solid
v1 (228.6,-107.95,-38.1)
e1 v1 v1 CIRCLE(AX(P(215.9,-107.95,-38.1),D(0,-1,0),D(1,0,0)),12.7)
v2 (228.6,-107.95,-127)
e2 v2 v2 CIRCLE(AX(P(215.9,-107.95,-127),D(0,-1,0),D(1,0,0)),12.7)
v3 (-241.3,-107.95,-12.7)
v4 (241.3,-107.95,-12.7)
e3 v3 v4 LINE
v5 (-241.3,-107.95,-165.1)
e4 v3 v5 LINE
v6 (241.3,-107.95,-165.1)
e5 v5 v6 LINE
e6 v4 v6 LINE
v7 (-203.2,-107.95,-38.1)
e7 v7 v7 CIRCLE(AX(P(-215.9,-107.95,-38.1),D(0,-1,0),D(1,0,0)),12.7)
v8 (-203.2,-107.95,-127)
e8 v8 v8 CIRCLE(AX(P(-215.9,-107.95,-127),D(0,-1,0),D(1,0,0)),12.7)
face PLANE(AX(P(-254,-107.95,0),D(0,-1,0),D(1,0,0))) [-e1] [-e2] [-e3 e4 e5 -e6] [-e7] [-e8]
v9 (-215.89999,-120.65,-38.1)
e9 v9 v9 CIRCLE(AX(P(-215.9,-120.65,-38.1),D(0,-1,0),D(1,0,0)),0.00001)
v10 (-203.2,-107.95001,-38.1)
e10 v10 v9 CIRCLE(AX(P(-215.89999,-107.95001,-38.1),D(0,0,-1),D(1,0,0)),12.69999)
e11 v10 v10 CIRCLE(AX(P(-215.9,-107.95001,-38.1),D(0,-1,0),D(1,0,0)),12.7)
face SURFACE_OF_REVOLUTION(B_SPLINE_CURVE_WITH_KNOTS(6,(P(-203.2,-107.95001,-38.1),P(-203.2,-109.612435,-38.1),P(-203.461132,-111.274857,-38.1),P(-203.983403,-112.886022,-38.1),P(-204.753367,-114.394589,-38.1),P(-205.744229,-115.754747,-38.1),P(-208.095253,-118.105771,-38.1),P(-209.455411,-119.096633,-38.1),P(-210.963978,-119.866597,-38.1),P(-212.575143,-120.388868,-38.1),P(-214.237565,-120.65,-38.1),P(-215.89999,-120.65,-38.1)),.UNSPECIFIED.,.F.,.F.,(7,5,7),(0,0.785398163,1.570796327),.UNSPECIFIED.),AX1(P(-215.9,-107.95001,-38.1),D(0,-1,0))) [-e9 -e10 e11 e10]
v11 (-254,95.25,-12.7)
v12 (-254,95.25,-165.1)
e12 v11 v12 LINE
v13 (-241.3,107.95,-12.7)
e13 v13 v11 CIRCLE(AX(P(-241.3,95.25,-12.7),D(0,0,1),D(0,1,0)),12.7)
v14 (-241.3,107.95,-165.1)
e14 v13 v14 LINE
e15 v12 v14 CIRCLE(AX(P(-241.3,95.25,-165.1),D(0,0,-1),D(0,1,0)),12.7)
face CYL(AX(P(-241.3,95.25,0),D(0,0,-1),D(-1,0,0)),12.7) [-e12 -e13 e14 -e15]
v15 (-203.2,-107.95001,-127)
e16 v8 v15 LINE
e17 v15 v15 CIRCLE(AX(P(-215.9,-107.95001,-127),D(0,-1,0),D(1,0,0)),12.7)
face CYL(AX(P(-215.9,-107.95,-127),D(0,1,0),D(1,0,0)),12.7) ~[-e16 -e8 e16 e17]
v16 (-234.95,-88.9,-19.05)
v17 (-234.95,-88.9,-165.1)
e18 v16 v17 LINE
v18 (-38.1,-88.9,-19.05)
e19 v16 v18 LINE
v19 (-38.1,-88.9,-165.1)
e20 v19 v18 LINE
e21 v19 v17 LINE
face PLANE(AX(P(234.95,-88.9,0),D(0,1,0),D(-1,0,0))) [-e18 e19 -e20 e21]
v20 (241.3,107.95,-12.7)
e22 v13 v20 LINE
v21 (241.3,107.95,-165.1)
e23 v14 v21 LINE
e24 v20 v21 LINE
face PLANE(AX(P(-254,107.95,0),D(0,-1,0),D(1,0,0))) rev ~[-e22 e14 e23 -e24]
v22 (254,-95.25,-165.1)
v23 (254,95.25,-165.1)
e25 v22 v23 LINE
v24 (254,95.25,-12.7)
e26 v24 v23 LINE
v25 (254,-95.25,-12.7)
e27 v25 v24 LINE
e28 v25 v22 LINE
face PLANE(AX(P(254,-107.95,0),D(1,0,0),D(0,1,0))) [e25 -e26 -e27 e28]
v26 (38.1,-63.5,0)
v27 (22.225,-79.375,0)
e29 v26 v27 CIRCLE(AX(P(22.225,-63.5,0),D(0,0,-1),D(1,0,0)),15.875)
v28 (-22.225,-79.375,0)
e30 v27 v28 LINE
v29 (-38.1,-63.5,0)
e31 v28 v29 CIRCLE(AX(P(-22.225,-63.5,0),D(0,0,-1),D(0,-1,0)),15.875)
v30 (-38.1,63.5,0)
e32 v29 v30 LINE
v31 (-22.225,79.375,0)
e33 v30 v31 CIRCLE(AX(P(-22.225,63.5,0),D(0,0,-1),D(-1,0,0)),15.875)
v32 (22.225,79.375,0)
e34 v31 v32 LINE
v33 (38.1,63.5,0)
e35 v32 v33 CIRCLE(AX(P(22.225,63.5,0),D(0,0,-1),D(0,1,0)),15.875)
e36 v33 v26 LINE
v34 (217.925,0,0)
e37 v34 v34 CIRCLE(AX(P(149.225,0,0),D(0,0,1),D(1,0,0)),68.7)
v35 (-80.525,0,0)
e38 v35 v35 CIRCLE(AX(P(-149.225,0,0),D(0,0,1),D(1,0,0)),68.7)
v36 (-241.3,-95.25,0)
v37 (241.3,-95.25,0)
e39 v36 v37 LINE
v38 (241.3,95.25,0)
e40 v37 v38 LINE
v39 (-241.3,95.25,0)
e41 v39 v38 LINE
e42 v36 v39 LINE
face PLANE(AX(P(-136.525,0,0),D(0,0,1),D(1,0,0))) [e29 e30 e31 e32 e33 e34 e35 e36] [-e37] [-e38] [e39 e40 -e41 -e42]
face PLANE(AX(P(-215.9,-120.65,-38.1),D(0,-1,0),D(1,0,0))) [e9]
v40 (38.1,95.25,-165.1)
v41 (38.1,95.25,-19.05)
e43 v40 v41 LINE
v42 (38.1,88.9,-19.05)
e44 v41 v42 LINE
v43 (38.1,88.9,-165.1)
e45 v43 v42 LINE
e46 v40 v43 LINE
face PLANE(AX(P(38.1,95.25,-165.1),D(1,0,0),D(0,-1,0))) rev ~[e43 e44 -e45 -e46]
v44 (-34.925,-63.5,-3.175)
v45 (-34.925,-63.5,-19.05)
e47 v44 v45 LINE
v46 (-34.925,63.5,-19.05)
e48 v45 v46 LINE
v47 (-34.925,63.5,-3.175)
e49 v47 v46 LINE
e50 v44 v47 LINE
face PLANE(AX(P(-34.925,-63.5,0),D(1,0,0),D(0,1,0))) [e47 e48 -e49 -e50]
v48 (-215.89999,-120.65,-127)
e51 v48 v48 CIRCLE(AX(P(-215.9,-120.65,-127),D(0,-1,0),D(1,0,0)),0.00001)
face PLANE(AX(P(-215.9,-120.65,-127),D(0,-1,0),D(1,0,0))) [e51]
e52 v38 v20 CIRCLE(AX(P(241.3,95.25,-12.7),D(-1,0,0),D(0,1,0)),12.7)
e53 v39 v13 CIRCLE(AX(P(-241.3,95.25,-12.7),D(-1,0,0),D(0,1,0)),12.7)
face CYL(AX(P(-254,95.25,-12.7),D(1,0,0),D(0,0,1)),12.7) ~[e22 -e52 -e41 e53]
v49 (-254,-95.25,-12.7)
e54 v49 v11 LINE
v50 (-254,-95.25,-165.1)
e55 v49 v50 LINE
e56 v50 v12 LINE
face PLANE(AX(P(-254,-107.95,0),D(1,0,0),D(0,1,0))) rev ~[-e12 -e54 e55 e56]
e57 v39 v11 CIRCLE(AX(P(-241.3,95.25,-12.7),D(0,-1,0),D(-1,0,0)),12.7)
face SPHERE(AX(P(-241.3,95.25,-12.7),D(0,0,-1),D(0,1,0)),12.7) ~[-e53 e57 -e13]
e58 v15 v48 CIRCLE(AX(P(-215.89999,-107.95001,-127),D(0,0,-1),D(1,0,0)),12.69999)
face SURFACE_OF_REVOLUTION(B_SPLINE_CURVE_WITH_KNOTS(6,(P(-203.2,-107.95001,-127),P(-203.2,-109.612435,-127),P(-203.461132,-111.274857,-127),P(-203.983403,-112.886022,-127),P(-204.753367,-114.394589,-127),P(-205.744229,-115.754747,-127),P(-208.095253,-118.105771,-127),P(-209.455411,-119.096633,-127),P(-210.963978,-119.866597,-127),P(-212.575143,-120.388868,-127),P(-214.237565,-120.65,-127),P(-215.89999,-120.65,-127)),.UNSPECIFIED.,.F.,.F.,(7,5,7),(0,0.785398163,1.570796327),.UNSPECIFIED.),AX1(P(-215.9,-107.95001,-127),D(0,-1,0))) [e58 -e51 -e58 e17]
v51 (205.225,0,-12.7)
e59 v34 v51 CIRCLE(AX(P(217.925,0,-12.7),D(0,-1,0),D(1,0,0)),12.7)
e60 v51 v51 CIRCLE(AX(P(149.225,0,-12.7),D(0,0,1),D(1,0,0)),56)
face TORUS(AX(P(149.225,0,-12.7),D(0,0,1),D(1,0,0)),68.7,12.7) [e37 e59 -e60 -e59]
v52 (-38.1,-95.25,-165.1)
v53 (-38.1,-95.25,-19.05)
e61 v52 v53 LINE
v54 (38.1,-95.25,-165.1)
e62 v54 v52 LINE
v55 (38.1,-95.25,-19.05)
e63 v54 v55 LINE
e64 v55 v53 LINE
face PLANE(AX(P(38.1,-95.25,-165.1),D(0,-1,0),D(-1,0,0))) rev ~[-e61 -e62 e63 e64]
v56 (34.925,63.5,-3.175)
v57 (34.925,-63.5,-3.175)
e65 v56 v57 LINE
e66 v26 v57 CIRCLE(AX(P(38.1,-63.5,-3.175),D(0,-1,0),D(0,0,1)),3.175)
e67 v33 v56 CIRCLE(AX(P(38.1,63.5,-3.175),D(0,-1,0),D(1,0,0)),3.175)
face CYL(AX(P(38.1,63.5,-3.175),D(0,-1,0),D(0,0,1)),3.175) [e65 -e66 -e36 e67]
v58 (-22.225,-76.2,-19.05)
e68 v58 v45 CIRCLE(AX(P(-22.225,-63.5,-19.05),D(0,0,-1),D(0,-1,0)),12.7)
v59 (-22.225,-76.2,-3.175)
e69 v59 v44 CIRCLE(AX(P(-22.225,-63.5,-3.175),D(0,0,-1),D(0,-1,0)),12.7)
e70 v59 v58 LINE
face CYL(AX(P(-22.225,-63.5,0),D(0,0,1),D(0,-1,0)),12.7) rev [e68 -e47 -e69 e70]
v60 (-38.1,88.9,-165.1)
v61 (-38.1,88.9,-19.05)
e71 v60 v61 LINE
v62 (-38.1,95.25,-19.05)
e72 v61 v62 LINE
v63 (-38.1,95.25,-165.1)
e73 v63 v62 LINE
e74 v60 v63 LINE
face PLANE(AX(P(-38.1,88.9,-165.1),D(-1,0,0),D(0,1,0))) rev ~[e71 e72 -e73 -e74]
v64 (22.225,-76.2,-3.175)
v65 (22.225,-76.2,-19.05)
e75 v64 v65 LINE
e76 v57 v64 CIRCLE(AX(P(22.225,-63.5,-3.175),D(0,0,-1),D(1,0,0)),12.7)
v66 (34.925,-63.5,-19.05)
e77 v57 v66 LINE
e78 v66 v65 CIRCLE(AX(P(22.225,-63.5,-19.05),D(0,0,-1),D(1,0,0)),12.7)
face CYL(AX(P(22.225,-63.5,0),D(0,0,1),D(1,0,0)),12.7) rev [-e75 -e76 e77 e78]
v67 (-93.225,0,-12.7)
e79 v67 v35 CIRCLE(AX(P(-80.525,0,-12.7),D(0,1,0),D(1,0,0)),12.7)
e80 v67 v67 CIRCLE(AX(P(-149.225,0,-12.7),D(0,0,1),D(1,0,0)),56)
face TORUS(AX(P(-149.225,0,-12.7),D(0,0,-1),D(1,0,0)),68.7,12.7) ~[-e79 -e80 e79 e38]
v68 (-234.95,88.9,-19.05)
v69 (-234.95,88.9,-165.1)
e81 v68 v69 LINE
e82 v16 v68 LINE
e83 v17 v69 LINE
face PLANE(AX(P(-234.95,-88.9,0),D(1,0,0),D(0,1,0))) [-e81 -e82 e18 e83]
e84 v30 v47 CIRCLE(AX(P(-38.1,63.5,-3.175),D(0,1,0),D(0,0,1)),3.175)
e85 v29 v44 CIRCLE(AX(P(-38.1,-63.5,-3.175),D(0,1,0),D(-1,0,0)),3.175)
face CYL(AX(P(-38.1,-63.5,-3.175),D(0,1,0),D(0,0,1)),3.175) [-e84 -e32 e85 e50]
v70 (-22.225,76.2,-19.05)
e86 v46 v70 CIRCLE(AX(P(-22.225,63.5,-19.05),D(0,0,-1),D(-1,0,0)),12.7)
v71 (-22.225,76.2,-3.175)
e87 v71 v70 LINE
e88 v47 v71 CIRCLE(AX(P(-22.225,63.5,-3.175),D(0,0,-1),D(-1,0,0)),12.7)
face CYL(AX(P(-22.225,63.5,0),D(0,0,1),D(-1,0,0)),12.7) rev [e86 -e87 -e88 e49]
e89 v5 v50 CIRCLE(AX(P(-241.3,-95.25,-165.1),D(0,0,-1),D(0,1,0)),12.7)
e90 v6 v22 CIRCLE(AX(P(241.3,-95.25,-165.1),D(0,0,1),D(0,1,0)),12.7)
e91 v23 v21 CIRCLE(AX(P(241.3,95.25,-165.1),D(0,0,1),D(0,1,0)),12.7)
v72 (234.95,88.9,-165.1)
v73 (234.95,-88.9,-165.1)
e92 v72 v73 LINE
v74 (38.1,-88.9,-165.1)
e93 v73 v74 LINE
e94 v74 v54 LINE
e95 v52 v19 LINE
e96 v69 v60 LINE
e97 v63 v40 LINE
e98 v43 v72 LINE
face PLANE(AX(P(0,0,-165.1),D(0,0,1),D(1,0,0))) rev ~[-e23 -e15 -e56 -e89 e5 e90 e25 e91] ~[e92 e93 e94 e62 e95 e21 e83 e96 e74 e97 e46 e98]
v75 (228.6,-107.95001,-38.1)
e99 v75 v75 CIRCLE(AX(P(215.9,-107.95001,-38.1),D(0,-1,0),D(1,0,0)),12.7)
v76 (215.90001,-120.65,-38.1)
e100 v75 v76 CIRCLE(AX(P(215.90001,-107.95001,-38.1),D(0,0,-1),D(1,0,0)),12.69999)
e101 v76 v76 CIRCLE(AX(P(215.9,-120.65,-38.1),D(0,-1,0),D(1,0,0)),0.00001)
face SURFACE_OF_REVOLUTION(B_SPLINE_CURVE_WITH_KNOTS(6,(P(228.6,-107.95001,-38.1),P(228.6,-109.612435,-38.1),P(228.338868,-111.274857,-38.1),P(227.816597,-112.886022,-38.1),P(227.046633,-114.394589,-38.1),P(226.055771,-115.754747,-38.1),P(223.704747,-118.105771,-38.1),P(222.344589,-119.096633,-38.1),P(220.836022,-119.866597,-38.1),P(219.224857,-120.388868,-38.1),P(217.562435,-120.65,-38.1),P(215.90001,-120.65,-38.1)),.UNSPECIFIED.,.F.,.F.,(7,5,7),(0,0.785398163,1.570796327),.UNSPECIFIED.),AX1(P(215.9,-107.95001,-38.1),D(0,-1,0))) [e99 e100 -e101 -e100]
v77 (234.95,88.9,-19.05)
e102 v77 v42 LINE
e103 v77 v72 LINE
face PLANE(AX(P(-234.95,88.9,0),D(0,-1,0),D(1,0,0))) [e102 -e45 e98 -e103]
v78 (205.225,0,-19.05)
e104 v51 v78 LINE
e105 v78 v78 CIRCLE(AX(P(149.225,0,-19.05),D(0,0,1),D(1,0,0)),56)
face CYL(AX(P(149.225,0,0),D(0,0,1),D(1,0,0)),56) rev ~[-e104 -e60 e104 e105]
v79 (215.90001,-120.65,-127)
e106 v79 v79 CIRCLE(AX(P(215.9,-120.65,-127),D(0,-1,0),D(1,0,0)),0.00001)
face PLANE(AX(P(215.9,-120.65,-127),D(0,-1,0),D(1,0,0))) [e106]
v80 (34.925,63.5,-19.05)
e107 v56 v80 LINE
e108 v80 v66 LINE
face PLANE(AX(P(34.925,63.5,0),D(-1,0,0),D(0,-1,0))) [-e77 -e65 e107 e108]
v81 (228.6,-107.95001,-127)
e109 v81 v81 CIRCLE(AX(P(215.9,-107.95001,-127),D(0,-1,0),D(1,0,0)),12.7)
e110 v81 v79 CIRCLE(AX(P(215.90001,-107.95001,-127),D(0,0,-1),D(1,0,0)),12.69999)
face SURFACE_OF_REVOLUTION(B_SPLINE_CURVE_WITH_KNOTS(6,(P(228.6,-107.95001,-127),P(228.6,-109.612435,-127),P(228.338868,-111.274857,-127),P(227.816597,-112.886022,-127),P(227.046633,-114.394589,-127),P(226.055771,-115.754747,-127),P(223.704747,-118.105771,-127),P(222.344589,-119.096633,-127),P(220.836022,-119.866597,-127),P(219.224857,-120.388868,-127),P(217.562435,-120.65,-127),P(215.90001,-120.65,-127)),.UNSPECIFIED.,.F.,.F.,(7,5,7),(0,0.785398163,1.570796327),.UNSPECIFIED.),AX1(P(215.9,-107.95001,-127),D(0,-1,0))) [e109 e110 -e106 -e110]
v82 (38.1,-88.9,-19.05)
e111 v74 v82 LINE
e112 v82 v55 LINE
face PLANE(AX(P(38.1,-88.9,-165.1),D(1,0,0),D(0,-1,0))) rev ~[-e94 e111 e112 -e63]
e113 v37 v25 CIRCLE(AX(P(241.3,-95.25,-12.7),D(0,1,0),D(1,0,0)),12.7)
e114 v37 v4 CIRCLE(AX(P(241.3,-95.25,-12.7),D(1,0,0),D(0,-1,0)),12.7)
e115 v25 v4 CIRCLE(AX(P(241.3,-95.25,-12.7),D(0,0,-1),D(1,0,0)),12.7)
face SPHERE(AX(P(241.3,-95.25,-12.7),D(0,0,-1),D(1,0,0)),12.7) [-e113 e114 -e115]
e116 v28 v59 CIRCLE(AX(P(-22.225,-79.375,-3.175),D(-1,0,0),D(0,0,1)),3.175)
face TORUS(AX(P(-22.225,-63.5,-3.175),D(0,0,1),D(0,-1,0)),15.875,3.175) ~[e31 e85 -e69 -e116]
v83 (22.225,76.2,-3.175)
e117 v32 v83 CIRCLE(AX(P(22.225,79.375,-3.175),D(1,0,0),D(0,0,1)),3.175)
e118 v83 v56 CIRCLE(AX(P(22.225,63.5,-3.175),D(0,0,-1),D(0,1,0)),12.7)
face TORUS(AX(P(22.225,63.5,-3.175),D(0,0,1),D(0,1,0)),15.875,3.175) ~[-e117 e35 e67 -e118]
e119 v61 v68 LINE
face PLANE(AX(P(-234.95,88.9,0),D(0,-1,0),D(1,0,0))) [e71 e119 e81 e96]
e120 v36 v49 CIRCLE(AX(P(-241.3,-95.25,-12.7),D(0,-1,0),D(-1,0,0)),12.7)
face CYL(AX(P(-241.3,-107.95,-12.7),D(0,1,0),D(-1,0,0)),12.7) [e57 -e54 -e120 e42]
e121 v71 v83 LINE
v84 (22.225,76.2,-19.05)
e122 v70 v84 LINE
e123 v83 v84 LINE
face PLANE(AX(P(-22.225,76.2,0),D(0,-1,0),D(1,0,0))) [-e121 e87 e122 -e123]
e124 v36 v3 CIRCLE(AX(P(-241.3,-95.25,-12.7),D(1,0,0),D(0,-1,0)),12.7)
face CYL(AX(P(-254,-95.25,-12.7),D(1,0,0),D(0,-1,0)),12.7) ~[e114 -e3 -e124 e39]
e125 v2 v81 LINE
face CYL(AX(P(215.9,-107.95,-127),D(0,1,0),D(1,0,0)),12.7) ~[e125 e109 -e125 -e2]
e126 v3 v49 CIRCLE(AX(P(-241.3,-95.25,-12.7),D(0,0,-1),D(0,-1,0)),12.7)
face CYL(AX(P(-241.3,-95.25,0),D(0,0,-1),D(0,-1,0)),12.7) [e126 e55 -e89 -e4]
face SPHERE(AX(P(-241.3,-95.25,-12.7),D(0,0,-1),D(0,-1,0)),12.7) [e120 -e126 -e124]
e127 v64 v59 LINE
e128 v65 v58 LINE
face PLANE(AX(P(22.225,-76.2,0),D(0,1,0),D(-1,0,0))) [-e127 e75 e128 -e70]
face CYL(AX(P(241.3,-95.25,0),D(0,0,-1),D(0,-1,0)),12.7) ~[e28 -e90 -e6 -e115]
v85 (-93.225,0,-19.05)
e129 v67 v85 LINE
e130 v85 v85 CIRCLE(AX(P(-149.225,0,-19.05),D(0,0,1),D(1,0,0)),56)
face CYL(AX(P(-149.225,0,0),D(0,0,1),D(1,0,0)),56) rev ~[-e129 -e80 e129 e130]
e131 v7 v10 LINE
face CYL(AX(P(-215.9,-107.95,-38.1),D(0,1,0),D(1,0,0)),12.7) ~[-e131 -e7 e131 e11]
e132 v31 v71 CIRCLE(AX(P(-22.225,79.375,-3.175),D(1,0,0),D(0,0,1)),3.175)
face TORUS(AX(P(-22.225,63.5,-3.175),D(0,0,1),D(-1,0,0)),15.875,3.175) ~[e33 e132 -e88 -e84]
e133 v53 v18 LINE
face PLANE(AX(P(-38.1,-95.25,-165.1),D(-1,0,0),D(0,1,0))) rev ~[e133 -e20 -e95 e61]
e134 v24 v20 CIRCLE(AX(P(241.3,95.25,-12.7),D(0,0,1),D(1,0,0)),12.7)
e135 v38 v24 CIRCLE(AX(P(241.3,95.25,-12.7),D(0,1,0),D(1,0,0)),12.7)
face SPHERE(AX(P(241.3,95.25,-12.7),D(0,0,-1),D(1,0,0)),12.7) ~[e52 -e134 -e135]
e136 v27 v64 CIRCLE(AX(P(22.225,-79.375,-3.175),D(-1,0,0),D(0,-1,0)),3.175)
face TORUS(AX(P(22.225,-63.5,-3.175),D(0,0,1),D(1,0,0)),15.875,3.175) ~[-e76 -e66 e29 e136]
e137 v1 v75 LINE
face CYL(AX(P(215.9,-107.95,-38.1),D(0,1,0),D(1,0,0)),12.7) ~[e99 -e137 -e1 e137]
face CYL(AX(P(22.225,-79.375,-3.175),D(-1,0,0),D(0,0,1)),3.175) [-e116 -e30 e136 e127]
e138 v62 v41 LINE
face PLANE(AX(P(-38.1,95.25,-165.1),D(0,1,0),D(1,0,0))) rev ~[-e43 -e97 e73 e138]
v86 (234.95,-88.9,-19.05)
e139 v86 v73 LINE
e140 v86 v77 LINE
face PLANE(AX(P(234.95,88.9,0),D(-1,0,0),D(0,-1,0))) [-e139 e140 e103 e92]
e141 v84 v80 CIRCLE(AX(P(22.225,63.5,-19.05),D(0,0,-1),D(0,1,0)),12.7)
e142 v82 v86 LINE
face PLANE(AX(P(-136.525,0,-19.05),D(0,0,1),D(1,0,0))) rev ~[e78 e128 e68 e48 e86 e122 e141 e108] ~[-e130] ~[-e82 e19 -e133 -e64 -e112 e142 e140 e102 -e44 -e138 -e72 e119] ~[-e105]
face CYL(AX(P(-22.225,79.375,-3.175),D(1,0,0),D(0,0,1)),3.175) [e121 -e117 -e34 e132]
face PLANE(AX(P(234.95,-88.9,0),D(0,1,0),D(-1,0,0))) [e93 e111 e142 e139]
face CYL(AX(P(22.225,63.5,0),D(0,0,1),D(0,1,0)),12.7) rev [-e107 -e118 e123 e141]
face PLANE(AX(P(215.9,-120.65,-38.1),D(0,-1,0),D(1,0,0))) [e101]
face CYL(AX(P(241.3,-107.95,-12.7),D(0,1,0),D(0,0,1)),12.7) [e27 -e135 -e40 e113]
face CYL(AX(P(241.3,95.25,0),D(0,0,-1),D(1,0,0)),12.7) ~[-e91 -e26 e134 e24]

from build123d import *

# Parameters (mm, degrees)
F0_W     = 508
F0_H     = 215.9
F1_DEPTH = 165.1
F0_W_2   = 196.85
F0_H_2   = 177.8
F0_R     = 56
F0_W_3   = 76.2
F2_DEPTH = 19.05
F4_DEPTH = 146.05
F5_R     = 12.7
F6_R     = 3.175
F7_R     = 12.7
F8_DEPTH = 12.7
F9_R     = 12.69999
F10_R    = 12.7


# Not quite as in the source:
# - a fillet or chamfer is up to 0.001 mm smaller than in the source, because OpenCascade refuses the exact size


with BuildPart() as f1:
    # F0 (on Top) → F1 (new body)
    with BuildSketch(Plane.XY):
        Rectangle(F0_W, F0_H)
        Polygon((234.95, -88.9), (38.1, -88.9), (-38.1, -88.9), (-234.95, -88.9), (-234.95, 88.9), (-38.1, 88.9), (38.1, 88.9), (234.95, 88.9), align=None, mode=Mode.SUBTRACT)
    extrude(amount=-F1_DEPTH)

    # F0 (on Top) → F2 (join)
    with BuildSketch(Plane.XY):
        with Locations((-136.525, 0)):
            Rectangle(F0_W_2, F0_H_2)
        with Locations((-149.225, 0)):
            Circle(F0_R, mode=Mode.SUBTRACT)
        with Locations((136.525, 0)):
            Rectangle(F0_W_2, F0_H_2)
        with Locations((149.225, 0)):
            Circle(F0_R, mode=Mode.SUBTRACT)
        Rectangle(F0_W_3, F0_H_2)
        with BuildLine():
            ThreePointArc((34.925, -63.5), (31.2052561211, -72.4802561211), (22.225, -76.2))
            Line((22.225, -76.2), (-22.225, -76.2))
            ThreePointArc((-22.225, -76.2), (-31.2052561211, -72.4802561211), (-34.925, -63.5))
            Line((-34.925, -63.5), (-34.925, 63.5))
            ThreePointArc((-34.925, 63.5), (-31.2052561211, 72.4802561211), (-22.225, 76.2))
            Line((-22.225, 76.2), (22.225, 76.2))
            ThreePointArc((22.225, 76.2), (31.2052561211, 72.4802561211), (34.925, 63.5))
            Line((34.925, 63.5), (34.925, -63.5))
        make_face(mode=Mode.SUBTRACT)
    extrude(amount=-F2_DEPTH)

    # F3 (on face) → F4 (cut)
    with BuildSketch(Plane(origin=(0, 0, -165.1), x_dir=(1, 0, 0), z_dir=(0, 0, -1))):
        Polygon((-38.1, -88.9), (0, -88.9), (38.1, -88.9), (234.95, -88.9), (234.95, 88.9), (38.1, 88.9), (0, 88.9), (-38.1, 88.9), (-234.95, 88.9), (-234.95, -88.9), align=None)
        Polygon((38.1, -88.9), (0, -88.9), (-38.1, -88.9), (-38.1, -95.25), (38.1, -95.25), align=None)
        Polygon((0, 88.9), (38.1, 88.9), (38.1, 95.25), (-38.1, 95.25), (-38.1, 88.9), align=None)
    extrude(amount=-F4_DEPTH, mode=Mode.SUBTRACT)

    # F5
    f5_edges = [f1.edges().sort_by_distance(p)[0] for p in [
        (93.225, 0, 0),
        (-205.225, 0, 0),
    ]]
    fillet(f5_edges, radius=F5_R)

    # F6
    f6_edges = [f1.edges().sort_by_distance(p)[0] for p in [
        (0, 76.2, 0),
        (-34.925, 0, 0),
        (-31.205256, 72.480256, 0),
        (31.205256, 72.480256, 0),
        (34.925, 0, 0),
        (31.205256, -72.480256, 0),
        (0, -76.2, 0),
        (-31.205256, -72.480256, 0),
    ]]
    fillet(f6_edges, radius=F6_R)

    # F7 (on face) → F8 (join)
    with BuildSketch(Plane.XZ.offset(107.95)):
        with Locations((-215.9, -38.1)):
            Circle(F7_R)
        with Locations((-215.9, -127)):
            Circle(F7_R)
        with Locations((215.9, -38.1)):
            Circle(F7_R)
        with Locations((215.9, -127)):
            Circle(F7_R)
    extrude(amount=F8_DEPTH)

    # F9 (radius 12.7 in the source; OpenCascade refuses exactly that, so slightly less here)
    f9_edges = [f1.edges().sort_by_distance(p)[0] for p in [
        (-228.6, -120.65, -127),
        (-228.6, -120.65, -38.1),
        (203.2, -120.65, -38.1),
        (203.2, -120.65, -127),
    ]]
    fillet(f9_edges, radius=F9_R)

    # F10
    f10_edges = [f1.edges().sort_by_distance(p)[0] for p in [
        (254, 107.95, -82.55),
        (254, -107.95, -82.55),
        (-254, -107.95, -82.55),
        (-254, 107.95, -82.55),
        (254, 0, 0),
        (0, 107.95, 0),
        (0, -107.95, 0),
        (-254, 0, 0),
    ]]
    fillet(f10_edges, radius=F10_R)


solid = f1.part
